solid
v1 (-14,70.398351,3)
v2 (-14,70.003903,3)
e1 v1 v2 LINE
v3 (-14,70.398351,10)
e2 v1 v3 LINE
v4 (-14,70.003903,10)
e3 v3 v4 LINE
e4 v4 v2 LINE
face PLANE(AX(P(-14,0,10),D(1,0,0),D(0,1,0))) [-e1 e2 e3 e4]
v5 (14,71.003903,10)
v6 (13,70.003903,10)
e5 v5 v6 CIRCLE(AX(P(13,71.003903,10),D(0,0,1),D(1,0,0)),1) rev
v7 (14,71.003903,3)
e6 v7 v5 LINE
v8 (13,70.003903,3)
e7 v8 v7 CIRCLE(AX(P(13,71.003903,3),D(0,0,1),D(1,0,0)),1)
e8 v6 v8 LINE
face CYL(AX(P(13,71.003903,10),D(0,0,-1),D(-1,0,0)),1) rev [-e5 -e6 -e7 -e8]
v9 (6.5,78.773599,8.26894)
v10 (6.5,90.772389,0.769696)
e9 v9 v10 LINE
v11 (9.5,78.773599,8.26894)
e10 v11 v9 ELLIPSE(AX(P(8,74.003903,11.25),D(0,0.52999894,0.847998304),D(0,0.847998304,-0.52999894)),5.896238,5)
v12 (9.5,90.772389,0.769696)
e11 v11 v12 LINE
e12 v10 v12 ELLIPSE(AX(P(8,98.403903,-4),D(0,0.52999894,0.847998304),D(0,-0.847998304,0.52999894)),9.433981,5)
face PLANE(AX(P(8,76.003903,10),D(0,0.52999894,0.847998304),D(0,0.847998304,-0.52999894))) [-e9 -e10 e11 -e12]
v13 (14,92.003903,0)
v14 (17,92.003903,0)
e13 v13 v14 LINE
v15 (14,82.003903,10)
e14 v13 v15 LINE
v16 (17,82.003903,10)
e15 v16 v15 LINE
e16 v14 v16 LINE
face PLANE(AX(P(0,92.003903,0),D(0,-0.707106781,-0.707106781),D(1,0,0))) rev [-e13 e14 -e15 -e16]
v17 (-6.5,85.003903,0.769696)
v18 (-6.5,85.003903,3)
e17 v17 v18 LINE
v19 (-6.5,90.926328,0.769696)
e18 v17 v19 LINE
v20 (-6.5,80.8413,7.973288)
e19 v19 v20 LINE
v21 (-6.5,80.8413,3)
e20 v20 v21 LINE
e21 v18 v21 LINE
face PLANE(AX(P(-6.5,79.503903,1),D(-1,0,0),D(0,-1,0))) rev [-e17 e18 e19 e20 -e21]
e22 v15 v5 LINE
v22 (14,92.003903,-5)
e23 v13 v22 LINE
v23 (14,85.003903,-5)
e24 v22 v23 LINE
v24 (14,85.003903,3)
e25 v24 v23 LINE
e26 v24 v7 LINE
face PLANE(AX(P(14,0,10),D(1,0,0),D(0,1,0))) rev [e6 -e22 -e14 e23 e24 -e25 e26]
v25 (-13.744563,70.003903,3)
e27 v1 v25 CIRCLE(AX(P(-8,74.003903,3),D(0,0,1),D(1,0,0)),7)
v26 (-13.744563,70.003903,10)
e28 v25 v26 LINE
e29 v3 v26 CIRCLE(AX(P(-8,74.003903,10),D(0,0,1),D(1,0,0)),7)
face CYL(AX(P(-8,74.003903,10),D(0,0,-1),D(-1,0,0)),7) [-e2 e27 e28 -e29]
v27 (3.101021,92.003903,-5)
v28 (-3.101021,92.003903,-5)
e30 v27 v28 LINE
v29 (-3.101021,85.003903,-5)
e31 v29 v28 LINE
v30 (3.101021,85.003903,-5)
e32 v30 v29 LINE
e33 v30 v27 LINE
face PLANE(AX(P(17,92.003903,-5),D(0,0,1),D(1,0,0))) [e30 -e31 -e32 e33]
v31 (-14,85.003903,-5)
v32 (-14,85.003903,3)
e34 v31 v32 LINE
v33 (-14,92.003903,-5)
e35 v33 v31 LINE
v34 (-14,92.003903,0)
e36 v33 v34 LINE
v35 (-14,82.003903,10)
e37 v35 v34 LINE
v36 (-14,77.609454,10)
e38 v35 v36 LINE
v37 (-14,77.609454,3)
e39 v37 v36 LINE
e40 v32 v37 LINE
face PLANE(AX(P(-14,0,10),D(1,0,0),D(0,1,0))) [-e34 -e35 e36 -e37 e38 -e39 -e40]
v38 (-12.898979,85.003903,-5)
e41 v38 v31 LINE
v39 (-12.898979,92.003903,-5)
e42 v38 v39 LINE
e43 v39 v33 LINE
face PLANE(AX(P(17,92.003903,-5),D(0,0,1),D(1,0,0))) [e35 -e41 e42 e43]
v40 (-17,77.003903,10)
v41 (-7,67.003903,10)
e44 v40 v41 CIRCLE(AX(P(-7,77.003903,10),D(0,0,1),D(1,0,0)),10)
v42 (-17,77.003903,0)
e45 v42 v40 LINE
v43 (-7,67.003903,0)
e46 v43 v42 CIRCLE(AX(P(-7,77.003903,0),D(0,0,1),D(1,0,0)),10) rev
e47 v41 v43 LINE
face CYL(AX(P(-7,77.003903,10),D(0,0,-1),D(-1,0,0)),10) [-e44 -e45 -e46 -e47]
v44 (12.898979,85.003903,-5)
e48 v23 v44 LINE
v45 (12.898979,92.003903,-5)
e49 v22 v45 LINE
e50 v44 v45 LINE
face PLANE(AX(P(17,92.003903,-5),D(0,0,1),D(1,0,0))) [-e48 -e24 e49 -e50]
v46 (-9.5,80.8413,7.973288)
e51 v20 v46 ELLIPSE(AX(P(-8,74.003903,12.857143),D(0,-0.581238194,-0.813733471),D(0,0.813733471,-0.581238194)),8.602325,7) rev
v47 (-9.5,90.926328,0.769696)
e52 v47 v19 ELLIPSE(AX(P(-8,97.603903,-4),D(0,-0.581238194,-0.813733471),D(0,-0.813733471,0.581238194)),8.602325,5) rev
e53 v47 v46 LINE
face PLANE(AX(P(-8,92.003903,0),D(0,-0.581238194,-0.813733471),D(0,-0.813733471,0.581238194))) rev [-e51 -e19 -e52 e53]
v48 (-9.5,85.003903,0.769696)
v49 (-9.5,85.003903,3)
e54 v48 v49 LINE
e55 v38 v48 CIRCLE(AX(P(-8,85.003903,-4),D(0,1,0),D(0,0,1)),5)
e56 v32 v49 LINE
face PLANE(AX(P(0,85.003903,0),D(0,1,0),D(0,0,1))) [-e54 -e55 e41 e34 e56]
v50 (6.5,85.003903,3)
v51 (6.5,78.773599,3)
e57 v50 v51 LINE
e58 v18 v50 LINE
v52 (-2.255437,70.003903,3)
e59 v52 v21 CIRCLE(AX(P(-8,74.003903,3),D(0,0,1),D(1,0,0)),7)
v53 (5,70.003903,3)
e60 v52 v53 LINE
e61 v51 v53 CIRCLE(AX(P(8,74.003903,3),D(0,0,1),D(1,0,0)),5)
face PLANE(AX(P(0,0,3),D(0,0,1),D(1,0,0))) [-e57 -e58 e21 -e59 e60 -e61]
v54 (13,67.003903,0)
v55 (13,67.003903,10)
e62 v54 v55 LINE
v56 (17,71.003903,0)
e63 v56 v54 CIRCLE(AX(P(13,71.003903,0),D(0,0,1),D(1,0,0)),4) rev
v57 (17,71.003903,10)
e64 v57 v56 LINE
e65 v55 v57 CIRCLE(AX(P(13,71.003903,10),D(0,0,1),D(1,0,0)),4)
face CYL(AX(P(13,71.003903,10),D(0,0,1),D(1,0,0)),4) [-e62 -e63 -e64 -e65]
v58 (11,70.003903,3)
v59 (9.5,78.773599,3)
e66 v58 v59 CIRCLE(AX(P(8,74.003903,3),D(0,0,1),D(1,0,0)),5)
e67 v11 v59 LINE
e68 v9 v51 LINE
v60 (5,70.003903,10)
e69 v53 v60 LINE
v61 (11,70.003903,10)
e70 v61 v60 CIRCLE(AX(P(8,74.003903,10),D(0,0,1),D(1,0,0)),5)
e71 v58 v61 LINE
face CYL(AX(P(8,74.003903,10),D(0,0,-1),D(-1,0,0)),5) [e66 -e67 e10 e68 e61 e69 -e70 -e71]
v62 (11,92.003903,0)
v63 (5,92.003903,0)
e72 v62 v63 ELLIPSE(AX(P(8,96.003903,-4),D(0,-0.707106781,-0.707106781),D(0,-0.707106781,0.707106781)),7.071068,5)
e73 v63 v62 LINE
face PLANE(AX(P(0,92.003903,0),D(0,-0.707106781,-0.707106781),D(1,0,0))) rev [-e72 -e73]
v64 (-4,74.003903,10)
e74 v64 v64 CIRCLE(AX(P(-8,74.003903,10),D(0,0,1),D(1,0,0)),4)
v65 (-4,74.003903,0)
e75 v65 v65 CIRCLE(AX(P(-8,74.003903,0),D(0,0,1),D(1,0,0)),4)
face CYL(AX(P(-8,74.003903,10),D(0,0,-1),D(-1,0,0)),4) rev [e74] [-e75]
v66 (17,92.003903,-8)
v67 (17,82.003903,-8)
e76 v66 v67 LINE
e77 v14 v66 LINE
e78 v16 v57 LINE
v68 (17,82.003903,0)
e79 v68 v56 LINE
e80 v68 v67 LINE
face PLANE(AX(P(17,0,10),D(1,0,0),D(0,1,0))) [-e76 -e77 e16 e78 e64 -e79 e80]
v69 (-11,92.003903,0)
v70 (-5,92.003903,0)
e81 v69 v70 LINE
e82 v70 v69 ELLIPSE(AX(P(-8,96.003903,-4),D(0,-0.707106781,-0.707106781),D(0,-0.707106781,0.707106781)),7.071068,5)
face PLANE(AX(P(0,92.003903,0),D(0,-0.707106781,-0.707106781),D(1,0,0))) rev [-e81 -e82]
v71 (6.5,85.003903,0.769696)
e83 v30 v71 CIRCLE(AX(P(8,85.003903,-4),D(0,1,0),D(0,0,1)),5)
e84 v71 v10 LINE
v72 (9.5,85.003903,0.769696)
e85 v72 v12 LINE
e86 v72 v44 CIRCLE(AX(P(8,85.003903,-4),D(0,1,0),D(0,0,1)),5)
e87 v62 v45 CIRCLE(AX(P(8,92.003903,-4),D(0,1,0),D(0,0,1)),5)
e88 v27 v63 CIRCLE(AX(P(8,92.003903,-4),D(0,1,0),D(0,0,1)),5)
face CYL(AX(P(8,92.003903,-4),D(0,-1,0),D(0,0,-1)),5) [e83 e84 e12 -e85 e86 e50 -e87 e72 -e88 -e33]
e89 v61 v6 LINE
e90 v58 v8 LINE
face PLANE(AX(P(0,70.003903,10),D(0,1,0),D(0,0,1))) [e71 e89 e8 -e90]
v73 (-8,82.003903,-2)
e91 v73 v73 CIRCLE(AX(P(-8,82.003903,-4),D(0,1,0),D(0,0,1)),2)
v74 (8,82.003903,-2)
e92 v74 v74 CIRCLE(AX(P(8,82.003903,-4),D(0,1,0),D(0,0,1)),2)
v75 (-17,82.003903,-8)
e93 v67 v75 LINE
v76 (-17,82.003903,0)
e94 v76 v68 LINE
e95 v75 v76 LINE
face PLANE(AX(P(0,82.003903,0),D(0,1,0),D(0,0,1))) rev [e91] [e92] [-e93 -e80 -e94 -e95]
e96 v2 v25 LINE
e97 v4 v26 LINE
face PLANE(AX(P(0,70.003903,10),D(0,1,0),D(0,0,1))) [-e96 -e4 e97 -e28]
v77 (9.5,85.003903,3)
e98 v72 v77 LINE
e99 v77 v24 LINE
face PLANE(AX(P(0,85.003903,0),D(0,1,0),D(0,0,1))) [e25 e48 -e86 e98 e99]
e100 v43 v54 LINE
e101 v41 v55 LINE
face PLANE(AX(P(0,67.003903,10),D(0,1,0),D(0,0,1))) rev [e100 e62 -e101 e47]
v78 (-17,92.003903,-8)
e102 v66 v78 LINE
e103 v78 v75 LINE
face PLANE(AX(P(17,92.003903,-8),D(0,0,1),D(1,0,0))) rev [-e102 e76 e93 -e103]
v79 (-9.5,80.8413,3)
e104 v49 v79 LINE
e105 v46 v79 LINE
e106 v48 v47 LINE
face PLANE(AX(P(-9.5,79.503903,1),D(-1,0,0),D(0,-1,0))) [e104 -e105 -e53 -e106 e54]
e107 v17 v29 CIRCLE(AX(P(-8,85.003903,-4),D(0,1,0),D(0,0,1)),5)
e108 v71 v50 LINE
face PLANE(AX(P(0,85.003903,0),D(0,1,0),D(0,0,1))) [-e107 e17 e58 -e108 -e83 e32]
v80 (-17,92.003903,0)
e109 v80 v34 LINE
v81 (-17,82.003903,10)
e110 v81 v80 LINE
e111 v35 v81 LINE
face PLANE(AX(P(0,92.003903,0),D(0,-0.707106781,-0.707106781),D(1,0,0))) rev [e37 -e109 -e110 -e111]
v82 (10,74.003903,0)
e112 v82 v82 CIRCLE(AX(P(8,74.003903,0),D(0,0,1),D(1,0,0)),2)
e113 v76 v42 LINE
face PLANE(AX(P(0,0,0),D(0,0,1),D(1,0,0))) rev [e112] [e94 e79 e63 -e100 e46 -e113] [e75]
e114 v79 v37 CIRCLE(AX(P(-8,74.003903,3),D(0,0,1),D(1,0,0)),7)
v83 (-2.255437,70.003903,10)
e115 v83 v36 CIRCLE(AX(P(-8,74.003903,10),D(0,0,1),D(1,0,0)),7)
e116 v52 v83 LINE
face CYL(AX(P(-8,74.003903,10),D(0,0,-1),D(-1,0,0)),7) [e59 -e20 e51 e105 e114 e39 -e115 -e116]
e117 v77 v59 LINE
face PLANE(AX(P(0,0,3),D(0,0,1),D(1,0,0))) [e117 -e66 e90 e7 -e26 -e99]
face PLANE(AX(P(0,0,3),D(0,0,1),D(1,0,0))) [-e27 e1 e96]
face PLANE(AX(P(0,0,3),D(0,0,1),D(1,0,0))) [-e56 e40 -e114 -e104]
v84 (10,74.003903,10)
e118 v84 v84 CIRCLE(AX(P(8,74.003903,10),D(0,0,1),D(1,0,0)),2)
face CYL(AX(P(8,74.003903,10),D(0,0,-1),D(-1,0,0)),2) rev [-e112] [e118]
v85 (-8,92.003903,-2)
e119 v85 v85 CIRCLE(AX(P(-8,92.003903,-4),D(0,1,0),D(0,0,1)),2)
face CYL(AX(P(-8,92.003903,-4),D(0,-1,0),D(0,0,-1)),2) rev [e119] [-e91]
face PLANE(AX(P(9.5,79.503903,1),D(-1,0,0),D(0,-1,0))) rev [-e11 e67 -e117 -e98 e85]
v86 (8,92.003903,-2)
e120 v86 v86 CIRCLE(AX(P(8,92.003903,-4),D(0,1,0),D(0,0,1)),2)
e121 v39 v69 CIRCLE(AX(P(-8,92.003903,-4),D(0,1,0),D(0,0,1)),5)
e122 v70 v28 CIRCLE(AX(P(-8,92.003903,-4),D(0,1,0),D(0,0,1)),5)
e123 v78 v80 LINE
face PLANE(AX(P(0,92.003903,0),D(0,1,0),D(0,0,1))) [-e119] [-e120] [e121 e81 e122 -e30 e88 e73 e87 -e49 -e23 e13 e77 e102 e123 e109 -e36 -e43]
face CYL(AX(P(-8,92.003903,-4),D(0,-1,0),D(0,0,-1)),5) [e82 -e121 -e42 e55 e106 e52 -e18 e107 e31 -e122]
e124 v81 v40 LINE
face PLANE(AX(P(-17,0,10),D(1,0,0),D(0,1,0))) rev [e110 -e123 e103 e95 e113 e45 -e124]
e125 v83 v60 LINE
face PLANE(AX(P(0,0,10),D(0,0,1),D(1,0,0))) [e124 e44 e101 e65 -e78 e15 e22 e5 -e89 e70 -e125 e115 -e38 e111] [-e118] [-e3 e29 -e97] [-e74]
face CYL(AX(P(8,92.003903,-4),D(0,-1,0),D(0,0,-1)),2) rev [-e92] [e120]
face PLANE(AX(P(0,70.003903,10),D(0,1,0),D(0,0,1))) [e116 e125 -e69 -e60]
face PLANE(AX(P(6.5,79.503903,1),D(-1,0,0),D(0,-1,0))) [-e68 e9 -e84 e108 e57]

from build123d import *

# Parameters (mm, degrees)
ESQUISSE1_W        = 34
ESQUISSE1_H        = 15
ESQUISSE1_R        = 4
ESQUISSE1_R_2      = 2
BOSS_EXTRU_2_DEPTH = 10
ESQUISSE2_W        = 34
ESQUISSE2_H        = 18
ESQUISSE2_R        = 2
BOSS_EXTRU_3_DEPTH = 10
CHANFREIN1_SIZE    = 10
COQUE4_START       = 3
COQUE4_DEPTH       = 7
COQUE4_START_2     = 1
COQUE4_2_OUTLINE_W = 28
COQUE4_2_OUTLINE_H = 7
COQUE4_2_DEPTH     = 2
COQUE4_START_3     = 85.003902516
COQUE4_3_DEPTH     = 7
NERVURE3_REACH     = 97.863
ESQUISSE4_WALL_W   = 212.593996784
ESQUISSE4_WALL_H   = 3
CONG_1_R           = 10
CONG_2_R           = 1
CONG_3_R           = 4
NERVURE4_REACH     = 97.863
ESQUISSE6_WALL_W   = 210.930685054
ESQUISSE6_WALL_H   = 3


with BuildPart() as part:
    # Esquisse1 → Boss.-Extru.2 (new body)
    with BuildSketch(Plane.XY):
        with Locations((0, 74.503902516)):
            Rectangle(ESQUISSE1_W, ESQUISSE1_H)
        with Locations((-8, 74.003902516)):
            Circle(ESQUISSE1_R, mode=Mode.SUBTRACT)
        with Locations((8, 74.003902516)):
            Circle(ESQUISSE1_R_2, mode=Mode.SUBTRACT)
    extrude(amount=BOSS_EXTRU_2_DEPTH)

    # Esquisse2 → Boss.-Extru.3 (add)
    with BuildSketch(Plane(origin=(0, 82.003902516, 0), x_dir=(1, 0, 0), z_dir=(0, 1, 0))):
        with Locations((0, -1)):
            Rectangle(ESQUISSE2_W, ESQUISSE2_H)
        with Locations(Location((-8, 4, 0), (0, 0, 270))):
            Circle(ESQUISSE2_R, mode=Mode.SUBTRACT)
        with Locations(Location((8, 4, 0), (0, 0, 270))):
            Circle(ESQUISSE2_R, mode=Mode.SUBTRACT)
    extrude(amount=BOSS_EXTRU_3_DEPTH)

    # Chanfrein1
    chanfrein1_edges = [part.edges().sort_by_distance(p)[0] for p in [
        (0, 92.003902516, 10),
    ]]
    chamfer(chanfrein1_edges, length=CHANFREIN1_SIZE)

    # Coque4: read off the stored shape, not the designer's step
    # Coque4 outline → Coque4 (cut)
    with BuildSketch(Plane.XY.offset(COQUE4_START)):
        with BuildLine():
            Line((14, 70.003902516), (14, 92.003902516))
            Line((14, 92.003902516), (-14, 92.003902516))
            Line((-14, 92.003902516), (-14, 77.609453792))
            ThreePointArc((-14, 77.609453792), (-4.195080209, 79.87949486), (-2.255437353, 70.003902516))
            Line((-2.255437353, 70.003902516), (5, 70.003902516))
            ThreePointArc((5, 70.003902516), (8, 79.003902516), (11, 70.003902516))
            Line((11, 70.003902516), (14, 70.003902516))
        make_face()
        with BuildLine():
            Line((-14, 70.003902516), (-13.744562647, 70.003902516))
            ThreePointArc((-13.744562647, 70.003902516), (-13.875592344, 70.198982726), (-14, 70.398351241))
            Line((-14, 70.398351241), (-14, 70.003902516))
        make_face()
    extrude(amount=COQUE4_DEPTH, mode=Mode.SUBTRACT)

    # Coque4 2 outline → Coque4 2 (cut)
    with BuildSketch(Plane.XY.offset(COQUE4_START_2)):
        with Locations((0, 88.503902516)):
            Rectangle(COQUE4_2_OUTLINE_W, COQUE4_2_OUTLINE_H)
    extrude(amount=COQUE4_2_DEPTH, mode=Mode.SUBTRACT)

    # Coque4 3 outline → Coque4 3 (cut)
    with BuildSketch(Plane(origin=(0, 0, 0), x_dir=(1, 0, 0), z_dir=(0, 1, 0)).offset(COQUE4_START_3)):
        with BuildLine():
            Line((14, 5), (12.898979486, 5))
            ThreePointArc((12.898979486, 5), (11.872983347, 0.83772234), (8, -1))
            Line((8, -1), (14, -1))
            Line((14, -1), (14, 5))
        make_face()
        with BuildLine():
            Line((-14, -1), (-8, -1))
            ThreePointArc((-8, -1), (-11.872983346, 0.83772234), (-12.898979485, 5))
            Line((-12.898979485, 5), (-14, 5))
            Line((-14, 5), (-14, -1))
        make_face()
        with BuildLine():
            Line((-8, -1), (8, -1))
            ThreePointArc((8, -1), (4.127016654, 0.83772234), (3.101020515, 5))
            Line((3.101020515, 5), (-3.101020514, 5))
            ThreePointArc((-3.101020514, 5), (-4.127016653, 0.83772234), (-8, -1))
        make_face()
    extrude(amount=COQUE4_3_DEPTH, mode=Mode.SUBTRACT)

    # Esquisse4 wall → Nervure3 (add, up to next)
    with BuildSketch(Plane(origin=(8, 84.003902516, 5), x_dir=(0, 0.847998304005, -0.529998940003), z_dir=(0, -0.529998940003, -0.847998304005)), mode=Mode.PRIVATE) as nervure3_sk1:
        Rectangle(ESQUISSE4_WALL_W, ESQUISSE4_WALL_H)
    nervure3_tool1 = extrude(nervure3_sk1.sketch, amount=NERVURE3_REACH, mode=Mode.PRIVATE) - part.part
    add(nervure3_tool1.solids().sort_by_distance((8, 84.003902516, 5))[0])

    # Congé1
    cong_1_edges = [part.edges().sort_by_distance(p)[0] for p in [
        (-17, 67.003902516, 5),
    ]]
    fillet(cong_1_edges, radius=CONG_1_R)

    # Congé2
    cong_2_edges = [part.edges().sort_by_distance(p)[0] for p in [
        (14, 70.003902516, 6.5),
    ]]
    fillet(cong_2_edges, radius=CONG_2_R)

    # Congé3
    cong_3_edges = [part.edges().sort_by_distance(p)[0] for p in [
        (17, 67.003902516, 5),
    ]]
    fillet(cong_3_edges, radius=CONG_3_R)

    # Esquisse6 wall → Nervure4 (add, up to next)
    with BuildSketch(Plane(origin=(-8, 85.003902516, 5), x_dir=(0, -0.813733471207, 0.581238193719), z_dir=(0, 0.581238193719, 0.813733471207)), mode=Mode.PRIVATE) as nervure4_sk1:
        Rectangle(ESQUISSE6_WALL_W, ESQUISSE6_WALL_H)
    nervure4_tool1 = extrude(nervure4_sk1.sketch, amount=-NERVURE4_REACH, mode=Mode.PRIVATE) - part.part
    add(nervure4_tool1.solids().sort_by_distance((-8, 85.003902516, 5))[0])


solid = part.part
